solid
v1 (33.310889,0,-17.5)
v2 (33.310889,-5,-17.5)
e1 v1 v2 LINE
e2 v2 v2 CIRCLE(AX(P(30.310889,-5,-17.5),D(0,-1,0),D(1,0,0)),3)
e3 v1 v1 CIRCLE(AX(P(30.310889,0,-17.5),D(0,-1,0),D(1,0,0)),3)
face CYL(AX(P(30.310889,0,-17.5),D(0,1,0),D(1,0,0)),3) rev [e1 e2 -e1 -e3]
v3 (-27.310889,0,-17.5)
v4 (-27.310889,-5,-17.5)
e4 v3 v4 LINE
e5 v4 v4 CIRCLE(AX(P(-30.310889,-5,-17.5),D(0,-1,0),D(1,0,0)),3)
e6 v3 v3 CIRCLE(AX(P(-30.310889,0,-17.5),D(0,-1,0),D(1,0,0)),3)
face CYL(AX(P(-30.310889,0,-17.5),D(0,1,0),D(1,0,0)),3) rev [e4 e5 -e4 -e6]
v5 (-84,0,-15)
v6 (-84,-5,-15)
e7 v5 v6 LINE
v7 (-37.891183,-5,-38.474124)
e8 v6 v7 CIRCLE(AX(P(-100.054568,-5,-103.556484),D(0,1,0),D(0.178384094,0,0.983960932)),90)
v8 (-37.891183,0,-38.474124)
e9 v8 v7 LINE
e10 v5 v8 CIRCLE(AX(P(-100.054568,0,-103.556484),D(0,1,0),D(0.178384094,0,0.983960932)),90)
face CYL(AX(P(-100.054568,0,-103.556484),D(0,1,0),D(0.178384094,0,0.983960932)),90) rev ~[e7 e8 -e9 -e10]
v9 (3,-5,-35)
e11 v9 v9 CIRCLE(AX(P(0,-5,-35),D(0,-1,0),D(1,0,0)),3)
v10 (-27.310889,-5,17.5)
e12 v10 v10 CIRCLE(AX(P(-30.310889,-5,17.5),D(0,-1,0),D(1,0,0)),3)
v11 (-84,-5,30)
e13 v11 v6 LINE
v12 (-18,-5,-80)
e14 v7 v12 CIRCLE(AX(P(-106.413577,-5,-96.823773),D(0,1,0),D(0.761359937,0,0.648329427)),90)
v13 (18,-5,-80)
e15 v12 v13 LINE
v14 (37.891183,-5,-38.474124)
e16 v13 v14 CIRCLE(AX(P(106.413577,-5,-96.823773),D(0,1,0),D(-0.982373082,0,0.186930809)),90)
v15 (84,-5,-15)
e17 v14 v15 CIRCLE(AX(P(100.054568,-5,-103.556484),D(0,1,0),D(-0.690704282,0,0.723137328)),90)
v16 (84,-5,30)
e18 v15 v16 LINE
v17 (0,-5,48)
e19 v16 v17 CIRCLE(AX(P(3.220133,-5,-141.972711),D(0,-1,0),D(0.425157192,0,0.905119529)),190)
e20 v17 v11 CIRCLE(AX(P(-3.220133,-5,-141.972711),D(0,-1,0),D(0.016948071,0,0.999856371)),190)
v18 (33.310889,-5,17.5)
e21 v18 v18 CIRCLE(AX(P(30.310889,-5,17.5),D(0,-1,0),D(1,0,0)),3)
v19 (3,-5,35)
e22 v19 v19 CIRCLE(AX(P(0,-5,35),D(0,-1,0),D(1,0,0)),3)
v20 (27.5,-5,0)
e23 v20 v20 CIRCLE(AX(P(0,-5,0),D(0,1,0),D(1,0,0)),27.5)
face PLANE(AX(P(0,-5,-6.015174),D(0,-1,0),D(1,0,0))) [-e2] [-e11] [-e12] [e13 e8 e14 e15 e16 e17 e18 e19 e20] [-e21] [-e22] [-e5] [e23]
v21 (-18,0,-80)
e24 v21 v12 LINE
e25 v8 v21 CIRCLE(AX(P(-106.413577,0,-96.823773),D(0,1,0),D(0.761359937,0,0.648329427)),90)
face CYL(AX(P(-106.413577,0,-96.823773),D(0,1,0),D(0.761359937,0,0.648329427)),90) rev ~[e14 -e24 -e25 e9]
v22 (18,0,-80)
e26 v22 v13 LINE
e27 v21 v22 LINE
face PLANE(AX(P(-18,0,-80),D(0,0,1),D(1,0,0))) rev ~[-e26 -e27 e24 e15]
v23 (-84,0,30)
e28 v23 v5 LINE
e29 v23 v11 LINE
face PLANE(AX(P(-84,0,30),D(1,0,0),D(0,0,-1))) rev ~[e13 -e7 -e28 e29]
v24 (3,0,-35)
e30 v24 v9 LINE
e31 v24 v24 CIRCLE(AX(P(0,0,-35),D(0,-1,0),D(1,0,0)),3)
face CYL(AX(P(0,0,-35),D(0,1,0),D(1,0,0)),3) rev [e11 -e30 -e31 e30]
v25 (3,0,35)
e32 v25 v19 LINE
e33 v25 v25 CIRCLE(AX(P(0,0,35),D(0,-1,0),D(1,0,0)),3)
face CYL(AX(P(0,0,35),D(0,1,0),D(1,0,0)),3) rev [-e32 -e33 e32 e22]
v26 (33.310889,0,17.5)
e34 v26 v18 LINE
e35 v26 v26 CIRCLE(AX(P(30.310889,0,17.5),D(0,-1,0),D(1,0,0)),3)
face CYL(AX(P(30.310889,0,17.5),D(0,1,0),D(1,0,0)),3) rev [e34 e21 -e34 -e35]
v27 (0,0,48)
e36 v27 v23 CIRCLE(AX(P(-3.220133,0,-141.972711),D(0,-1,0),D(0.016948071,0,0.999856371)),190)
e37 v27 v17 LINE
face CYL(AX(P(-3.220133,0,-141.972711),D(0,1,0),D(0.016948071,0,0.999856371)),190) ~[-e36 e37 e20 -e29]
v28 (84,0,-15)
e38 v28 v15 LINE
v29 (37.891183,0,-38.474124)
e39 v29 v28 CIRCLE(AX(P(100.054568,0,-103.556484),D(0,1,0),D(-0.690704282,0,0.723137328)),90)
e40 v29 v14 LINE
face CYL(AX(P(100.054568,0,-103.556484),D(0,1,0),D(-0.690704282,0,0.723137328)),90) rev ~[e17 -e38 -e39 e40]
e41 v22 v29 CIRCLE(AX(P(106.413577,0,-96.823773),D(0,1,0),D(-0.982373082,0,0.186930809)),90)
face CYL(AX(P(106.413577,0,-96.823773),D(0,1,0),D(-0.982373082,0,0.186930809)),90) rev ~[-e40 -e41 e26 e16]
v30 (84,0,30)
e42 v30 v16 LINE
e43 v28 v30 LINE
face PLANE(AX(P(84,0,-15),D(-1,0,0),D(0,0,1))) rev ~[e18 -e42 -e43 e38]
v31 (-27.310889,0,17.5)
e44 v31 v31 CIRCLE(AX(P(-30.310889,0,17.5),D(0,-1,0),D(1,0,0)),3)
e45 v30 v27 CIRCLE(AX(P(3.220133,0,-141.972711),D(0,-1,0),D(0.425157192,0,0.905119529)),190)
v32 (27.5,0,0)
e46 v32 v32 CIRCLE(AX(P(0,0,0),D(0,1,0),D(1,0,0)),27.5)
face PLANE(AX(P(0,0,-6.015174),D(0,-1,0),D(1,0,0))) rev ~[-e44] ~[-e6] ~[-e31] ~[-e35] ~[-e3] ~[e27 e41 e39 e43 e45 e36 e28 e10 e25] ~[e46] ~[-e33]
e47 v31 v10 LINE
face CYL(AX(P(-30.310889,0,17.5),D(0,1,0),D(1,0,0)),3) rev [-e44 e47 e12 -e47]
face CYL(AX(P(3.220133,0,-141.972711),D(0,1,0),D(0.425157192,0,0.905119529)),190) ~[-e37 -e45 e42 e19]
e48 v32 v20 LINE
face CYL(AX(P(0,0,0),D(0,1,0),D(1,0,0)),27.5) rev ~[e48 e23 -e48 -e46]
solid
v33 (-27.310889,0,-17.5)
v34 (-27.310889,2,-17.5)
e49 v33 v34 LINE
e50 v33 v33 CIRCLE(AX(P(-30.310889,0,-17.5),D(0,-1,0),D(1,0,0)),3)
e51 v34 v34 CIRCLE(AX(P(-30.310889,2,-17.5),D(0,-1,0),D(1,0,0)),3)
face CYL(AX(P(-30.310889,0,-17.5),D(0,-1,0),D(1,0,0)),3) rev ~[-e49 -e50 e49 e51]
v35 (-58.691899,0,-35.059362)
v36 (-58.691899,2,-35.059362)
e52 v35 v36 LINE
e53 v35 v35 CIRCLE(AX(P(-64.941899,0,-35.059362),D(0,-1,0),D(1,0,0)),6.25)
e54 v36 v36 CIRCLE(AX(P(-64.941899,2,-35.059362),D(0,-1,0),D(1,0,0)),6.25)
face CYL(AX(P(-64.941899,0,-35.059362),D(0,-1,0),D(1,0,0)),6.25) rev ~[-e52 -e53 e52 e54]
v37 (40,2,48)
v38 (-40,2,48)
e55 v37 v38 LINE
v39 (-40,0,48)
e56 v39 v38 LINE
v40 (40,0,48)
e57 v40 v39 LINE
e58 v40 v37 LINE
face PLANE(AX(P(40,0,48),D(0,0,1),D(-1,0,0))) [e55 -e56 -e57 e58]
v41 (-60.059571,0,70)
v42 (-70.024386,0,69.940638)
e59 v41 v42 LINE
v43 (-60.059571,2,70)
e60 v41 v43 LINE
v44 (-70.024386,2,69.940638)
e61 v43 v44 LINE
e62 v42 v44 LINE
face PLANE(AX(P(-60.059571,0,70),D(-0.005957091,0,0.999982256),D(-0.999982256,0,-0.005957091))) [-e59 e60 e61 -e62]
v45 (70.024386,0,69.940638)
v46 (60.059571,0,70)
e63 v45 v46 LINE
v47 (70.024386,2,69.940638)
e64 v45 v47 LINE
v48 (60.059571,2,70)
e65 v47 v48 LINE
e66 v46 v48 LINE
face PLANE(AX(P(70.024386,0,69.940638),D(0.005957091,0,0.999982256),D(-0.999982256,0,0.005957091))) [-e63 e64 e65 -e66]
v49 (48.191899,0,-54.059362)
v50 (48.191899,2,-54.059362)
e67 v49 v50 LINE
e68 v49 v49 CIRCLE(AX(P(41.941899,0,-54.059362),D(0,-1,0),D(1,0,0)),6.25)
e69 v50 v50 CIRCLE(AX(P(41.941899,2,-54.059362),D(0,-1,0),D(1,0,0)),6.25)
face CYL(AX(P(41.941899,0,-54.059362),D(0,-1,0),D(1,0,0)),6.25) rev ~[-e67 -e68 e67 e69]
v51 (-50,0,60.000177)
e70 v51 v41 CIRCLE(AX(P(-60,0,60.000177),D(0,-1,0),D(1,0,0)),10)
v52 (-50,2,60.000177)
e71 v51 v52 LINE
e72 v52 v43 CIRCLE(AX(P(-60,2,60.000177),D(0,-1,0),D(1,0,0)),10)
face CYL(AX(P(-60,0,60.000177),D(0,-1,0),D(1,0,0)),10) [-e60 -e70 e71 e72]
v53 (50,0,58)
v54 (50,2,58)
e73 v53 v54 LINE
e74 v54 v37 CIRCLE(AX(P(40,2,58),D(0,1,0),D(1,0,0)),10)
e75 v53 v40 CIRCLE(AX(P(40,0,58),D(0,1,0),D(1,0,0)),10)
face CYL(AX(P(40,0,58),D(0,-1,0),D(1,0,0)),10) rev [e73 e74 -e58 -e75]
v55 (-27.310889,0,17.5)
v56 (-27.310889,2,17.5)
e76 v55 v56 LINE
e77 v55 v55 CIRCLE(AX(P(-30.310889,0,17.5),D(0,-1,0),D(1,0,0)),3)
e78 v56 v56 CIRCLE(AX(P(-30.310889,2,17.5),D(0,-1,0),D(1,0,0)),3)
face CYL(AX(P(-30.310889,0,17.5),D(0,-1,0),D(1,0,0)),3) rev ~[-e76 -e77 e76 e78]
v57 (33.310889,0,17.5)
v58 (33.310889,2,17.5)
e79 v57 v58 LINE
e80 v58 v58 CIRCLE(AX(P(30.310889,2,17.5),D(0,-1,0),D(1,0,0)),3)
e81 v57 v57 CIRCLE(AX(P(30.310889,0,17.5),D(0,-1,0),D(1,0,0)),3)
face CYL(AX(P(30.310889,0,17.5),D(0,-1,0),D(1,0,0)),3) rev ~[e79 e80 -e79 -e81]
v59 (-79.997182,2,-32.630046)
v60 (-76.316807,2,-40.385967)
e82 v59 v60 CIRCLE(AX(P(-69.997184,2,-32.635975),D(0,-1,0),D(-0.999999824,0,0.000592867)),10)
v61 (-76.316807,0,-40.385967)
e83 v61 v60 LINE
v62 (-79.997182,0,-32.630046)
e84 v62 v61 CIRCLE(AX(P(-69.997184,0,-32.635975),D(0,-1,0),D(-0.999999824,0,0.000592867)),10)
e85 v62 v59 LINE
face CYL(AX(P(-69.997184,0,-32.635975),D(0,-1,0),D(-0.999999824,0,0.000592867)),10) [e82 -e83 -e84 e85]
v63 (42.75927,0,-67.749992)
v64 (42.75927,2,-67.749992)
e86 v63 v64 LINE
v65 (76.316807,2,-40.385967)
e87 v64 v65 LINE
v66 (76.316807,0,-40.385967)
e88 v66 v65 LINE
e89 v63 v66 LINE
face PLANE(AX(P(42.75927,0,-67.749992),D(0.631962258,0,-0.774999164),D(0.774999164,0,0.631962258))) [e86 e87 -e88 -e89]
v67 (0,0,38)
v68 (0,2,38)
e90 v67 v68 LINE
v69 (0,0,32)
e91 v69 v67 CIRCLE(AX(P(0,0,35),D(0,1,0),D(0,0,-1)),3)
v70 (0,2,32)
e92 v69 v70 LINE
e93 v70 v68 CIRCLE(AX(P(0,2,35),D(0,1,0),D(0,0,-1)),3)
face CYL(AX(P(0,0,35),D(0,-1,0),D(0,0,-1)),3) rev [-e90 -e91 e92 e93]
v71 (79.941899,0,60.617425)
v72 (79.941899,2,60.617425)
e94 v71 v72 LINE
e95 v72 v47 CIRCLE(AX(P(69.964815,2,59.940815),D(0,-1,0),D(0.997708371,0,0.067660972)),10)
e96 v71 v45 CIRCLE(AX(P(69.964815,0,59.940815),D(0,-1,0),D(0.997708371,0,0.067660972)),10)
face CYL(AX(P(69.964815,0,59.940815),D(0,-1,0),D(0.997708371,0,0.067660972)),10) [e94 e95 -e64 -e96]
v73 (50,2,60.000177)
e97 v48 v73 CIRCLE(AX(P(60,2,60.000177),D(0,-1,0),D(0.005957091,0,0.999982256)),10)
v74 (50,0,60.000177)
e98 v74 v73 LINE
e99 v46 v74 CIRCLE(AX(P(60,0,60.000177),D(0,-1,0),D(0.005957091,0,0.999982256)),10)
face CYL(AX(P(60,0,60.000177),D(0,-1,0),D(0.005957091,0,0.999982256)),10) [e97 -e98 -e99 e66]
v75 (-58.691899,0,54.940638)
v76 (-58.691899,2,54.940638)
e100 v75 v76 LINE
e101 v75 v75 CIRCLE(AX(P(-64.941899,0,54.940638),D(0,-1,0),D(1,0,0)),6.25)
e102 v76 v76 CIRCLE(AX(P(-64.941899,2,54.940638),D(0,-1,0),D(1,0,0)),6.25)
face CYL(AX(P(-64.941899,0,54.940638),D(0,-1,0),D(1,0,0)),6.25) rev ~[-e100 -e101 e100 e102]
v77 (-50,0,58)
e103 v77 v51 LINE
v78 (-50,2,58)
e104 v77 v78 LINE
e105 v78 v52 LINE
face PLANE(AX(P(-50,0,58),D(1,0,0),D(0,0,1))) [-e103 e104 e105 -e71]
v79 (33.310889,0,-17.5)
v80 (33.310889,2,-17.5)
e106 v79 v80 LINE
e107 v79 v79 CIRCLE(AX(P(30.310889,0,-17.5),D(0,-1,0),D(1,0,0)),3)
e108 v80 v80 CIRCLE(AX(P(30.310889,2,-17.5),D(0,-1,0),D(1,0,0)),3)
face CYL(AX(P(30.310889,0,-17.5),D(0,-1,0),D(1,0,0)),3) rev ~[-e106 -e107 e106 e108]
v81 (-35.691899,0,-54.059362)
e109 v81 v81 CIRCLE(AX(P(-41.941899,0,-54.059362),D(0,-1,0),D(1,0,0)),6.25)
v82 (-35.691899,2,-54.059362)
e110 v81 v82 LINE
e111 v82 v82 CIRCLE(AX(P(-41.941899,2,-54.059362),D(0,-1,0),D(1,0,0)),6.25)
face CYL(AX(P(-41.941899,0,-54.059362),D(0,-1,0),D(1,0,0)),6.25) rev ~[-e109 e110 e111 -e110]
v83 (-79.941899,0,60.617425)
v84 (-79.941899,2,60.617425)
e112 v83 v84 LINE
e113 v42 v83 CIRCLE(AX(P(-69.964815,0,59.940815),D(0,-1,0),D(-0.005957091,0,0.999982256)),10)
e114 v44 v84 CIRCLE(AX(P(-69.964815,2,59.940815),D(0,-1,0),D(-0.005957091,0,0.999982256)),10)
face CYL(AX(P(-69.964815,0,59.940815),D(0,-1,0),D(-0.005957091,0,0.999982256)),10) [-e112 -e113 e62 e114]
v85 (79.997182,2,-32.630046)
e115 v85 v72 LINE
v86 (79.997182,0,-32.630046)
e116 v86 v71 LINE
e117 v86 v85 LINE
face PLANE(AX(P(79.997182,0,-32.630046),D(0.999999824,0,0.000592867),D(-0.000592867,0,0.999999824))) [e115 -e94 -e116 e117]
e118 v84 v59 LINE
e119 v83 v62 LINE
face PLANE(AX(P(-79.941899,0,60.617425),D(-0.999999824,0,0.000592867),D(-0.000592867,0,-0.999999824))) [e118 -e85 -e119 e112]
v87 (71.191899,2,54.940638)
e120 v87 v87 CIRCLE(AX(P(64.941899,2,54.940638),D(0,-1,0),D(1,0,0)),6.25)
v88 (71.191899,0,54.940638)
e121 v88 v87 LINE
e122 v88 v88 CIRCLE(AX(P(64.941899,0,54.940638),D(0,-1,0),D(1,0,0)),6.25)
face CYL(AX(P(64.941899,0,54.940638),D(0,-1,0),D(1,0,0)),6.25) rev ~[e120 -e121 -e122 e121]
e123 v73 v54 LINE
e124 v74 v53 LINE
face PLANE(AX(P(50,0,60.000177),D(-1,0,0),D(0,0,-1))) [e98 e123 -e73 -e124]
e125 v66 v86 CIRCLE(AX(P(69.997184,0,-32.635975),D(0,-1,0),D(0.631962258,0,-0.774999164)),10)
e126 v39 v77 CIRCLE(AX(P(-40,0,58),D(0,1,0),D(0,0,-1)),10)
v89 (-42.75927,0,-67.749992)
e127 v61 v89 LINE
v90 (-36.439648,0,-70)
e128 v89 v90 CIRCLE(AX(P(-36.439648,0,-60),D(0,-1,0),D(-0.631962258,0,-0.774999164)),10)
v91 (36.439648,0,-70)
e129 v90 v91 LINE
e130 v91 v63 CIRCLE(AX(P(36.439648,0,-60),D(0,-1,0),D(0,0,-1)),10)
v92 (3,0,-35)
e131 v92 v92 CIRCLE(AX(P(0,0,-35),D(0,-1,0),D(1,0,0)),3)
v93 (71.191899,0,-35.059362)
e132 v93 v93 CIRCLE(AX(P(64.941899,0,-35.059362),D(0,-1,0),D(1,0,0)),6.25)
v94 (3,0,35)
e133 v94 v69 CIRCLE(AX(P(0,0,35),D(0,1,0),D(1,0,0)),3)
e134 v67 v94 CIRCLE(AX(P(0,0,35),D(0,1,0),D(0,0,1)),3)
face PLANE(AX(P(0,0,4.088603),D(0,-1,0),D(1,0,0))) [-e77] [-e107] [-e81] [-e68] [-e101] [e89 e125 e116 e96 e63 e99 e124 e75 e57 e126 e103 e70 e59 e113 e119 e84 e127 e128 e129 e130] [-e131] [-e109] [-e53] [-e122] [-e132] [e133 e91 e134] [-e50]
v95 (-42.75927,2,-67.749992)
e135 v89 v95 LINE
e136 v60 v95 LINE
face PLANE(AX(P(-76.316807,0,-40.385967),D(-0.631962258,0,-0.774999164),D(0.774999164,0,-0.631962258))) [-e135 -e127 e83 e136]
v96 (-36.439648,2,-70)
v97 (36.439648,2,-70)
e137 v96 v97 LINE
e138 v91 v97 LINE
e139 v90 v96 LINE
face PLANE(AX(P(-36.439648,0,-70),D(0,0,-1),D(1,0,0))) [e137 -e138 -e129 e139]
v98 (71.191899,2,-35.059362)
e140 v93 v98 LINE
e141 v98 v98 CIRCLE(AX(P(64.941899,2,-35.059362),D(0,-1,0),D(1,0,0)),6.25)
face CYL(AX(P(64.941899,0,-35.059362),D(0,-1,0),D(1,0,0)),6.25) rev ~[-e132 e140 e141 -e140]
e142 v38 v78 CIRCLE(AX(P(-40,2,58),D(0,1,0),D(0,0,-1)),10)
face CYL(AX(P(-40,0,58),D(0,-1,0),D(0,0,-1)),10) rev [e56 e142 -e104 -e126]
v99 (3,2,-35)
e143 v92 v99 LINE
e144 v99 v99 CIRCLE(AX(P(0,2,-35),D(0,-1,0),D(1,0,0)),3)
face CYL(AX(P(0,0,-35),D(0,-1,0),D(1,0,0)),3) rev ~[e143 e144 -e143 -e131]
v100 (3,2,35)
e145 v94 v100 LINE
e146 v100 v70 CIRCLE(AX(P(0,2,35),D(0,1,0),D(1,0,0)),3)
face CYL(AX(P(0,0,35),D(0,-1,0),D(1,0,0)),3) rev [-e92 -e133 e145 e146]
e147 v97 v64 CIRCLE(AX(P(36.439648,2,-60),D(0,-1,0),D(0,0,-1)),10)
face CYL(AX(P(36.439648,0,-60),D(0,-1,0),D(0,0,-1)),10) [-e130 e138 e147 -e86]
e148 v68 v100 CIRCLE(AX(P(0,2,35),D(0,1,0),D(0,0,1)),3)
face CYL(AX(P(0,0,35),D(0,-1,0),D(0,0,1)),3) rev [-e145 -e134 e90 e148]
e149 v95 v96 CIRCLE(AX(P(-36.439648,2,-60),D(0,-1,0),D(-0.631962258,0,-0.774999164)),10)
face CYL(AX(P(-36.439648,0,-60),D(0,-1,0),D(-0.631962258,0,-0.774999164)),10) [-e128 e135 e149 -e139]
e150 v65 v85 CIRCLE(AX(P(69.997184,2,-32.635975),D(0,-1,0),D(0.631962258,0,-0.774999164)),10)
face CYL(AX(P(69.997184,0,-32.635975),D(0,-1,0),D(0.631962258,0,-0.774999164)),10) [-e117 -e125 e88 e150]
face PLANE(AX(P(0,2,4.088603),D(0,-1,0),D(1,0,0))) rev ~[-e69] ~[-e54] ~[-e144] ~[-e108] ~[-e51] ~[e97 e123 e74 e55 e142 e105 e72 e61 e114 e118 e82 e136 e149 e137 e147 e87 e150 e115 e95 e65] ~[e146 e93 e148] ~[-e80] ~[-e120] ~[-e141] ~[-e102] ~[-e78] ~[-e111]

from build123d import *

# Parameters (mm, degrees)
F0_R     = 3
F1_DEPTH = 5
F2_R     = 6.25
F2_R_2   = 3
F3_DEPTH = 2


# Not quite as in the source:
# - a feature names something its author has since deleted; it is built from what else it names


with BuildPart() as f1:
    # F0 (on Front) → F1 (new body)
    with BuildSketch(Plane.XZ):
        with BuildLine():
            ThreePointArc((18, -80), (25.2450835608, -57.9435000854), (37.8911830779, -38.474124356))
            ThreePointArc((37.8911830779, -38.474124356), (59.2223421632, -23.3521866114), (84, -15))
            Line((84, -15), (84, 30))
            ThreePointArc((84, 30), (43.0306603199, 43.8097481595), (0, 48))
            ThreePointArc((0, 48), (-43.0306603199, 43.8097481595), (-84, 30))
            Line((-84, 30), (-84, -15))
            ThreePointArc((-84, -15), (-59.2223421632, -23.3521866114), (-37.8911830779, -38.474124356))
            ThreePointArc((-37.8911830779, -38.474124356), (-25.2450835608, -57.9435000854), (-18, -80))
            Line((-18, -80), (0, -80))
            Line((0, -80), (18, -80))
        make_face()
        with Locations((-30.3108891325, -17.5)):
            Circle(F0_R, mode=Mode.SUBTRACT)
        with Locations((0, -35)):
            Circle(F0_R, mode=Mode.SUBTRACT)
        with Locations((30.3108891325, -17.5)):
            Circle(F0_R, mode=Mode.SUBTRACT)
        with Locations((-30.3108891325, 17.5)):
            Circle(F0_R, mode=Mode.SUBTRACT)
        with BuildLine():
            ThreePointArc((19.2964358267, -19.5933040702), (-25.3663358138, 10.6206877076), (27.5, 0))
            ThreePointArc((27.5, 0), (25.3663358138, -10.6206877076), (19.2964358267, -19.5933040702))
        make_face(mode=Mode.SUBTRACT)
        with Locations((30.3108891325, 17.5)):
            Circle(F0_R, mode=Mode.SUBTRACT)
        with Locations((0, 35)):
            Circle(F0_R, mode=Mode.SUBTRACT)
    extrude(amount=F1_DEPTH)


with BuildPart() as f3:
    # F2 (on Front) → F3 (new body)
    with BuildSketch(Plane.XZ):
        with BuildLine():
            Line((40, 48), (0, 48))
            Line((0, 48), (-40, 48))
            ThreePointArc((-40, 48), (-47.0710678119, 50.9289321881), (-50, 58))
            Line((-50, 58), (-50, 60.0001774362))
            ThreePointArc((-50, 60.0001774362), (-52.9500251451, 67.0922754718), (-60.0595709092, 70))
            Line((-60.0595709092, 70), (-70.0243862443, 69.9406376358))
            ThreePointArc((-70.0243862443, 69.9406376358), (-76.8142082584, 67.2268164845), (-79.9418990419, 60.6174247888))
            Line((-79.9418990419, 60.6174247888), (-79.9971823925, -32.6300462499))
            ThreePointArc((-79.9971823925, -32.6300462499), (-79.0316227544, -36.923039078), (-76.3168067264, -40.3859665636))
            Line((-76.3168067264, -40.3859665636), (-42.7592701532, -67.7499916446))
            ThreePointArc((-42.7592701532, -67.7499916446), (-39.7937557707, -69.4207196234), (-36.4396475767, -70))
            Line((-36.4396475767, -70), (0, -70))
            Line((0, -70), (36.4396475767, -70))
            ThreePointArc((36.4396475767, -70), (39.7937557707, -69.4207196234), (42.7592701532, -67.7499916446))
            Line((42.7592701532, -67.7499916446), (76.3168067264, -40.3859665636))
            ThreePointArc((76.3168067264, -40.3859665636), (79.0316227544, -36.923039078), (79.9971823925, -32.6300462499))
            Line((79.9971823925, -32.6300462499), (79.9418990419, 60.6174247888))
            ThreePointArc((79.9418990419, 60.6174247888), (76.8142082584, 67.2268164845), (70.0243862443, 69.9406376358))
            Line((70.0243862443, 69.9406376358), (60.0595709092, 70))
            ThreePointArc((60.0595709092, 70), (52.9500251451, 67.0922754718), (50, 60.0001774362))
            Line((50, 60.0001774362), (50, 58))
            ThreePointArc((50, 58), (47.0710678119, 50.9289321881), (40, 48))
        make_face()
        with Locations((-41.9418990419, -54.0593623642)):
            Circle(F2_R, mode=Mode.SUBTRACT)
        with Locations((-64.9418990419, -35.0593623642)):
            Circle(F2_R, mode=Mode.SUBTRACT)
        with Locations((-30.3108891325, -17.5)):
            Circle(F2_R_2, mode=Mode.SUBTRACT)
        with Locations((0, -35)):
            Circle(F2_R_2, mode=Mode.SUBTRACT)
        with Locations((41.9418990419, -54.0593623642)):
            Circle(F2_R, mode=Mode.SUBTRACT)
        with Locations((64.9418990419, -35.0593623642)):
            Circle(F2_R, mode=Mode.SUBTRACT)
        with Locations((30.3108891325, -17.5)):
            Circle(F2_R_2, mode=Mode.SUBTRACT)
        with Locations((-30.3108891325, 17.5)):
            Circle(F2_R_2, mode=Mode.SUBTRACT)
        with Locations((-64.9418990419, 54.9406376358)):
            Circle(F2_R, mode=Mode.SUBTRACT)
        with Locations((30.3108891325, 17.5)):
            Circle(F2_R_2, mode=Mode.SUBTRACT)
        with BuildLine():
            ThreePointArc((0, 32), (-3, 35), (0, 38))
            ThreePointArc((0, 38), (2.1213203436, 37.1213203436), (3, 35))
            ThreePointArc((3, 35), (2.1213203436, 32.8786796564), (0, 32))
        make_face(mode=Mode.SUBTRACT)
        with Locations((64.9418990419, 54.9406376358)):
            Circle(F2_R, mode=Mode.SUBTRACT)
    extrude(amount=-F3_DEPTH)


solid = Compound([f1.part, f3.part])
